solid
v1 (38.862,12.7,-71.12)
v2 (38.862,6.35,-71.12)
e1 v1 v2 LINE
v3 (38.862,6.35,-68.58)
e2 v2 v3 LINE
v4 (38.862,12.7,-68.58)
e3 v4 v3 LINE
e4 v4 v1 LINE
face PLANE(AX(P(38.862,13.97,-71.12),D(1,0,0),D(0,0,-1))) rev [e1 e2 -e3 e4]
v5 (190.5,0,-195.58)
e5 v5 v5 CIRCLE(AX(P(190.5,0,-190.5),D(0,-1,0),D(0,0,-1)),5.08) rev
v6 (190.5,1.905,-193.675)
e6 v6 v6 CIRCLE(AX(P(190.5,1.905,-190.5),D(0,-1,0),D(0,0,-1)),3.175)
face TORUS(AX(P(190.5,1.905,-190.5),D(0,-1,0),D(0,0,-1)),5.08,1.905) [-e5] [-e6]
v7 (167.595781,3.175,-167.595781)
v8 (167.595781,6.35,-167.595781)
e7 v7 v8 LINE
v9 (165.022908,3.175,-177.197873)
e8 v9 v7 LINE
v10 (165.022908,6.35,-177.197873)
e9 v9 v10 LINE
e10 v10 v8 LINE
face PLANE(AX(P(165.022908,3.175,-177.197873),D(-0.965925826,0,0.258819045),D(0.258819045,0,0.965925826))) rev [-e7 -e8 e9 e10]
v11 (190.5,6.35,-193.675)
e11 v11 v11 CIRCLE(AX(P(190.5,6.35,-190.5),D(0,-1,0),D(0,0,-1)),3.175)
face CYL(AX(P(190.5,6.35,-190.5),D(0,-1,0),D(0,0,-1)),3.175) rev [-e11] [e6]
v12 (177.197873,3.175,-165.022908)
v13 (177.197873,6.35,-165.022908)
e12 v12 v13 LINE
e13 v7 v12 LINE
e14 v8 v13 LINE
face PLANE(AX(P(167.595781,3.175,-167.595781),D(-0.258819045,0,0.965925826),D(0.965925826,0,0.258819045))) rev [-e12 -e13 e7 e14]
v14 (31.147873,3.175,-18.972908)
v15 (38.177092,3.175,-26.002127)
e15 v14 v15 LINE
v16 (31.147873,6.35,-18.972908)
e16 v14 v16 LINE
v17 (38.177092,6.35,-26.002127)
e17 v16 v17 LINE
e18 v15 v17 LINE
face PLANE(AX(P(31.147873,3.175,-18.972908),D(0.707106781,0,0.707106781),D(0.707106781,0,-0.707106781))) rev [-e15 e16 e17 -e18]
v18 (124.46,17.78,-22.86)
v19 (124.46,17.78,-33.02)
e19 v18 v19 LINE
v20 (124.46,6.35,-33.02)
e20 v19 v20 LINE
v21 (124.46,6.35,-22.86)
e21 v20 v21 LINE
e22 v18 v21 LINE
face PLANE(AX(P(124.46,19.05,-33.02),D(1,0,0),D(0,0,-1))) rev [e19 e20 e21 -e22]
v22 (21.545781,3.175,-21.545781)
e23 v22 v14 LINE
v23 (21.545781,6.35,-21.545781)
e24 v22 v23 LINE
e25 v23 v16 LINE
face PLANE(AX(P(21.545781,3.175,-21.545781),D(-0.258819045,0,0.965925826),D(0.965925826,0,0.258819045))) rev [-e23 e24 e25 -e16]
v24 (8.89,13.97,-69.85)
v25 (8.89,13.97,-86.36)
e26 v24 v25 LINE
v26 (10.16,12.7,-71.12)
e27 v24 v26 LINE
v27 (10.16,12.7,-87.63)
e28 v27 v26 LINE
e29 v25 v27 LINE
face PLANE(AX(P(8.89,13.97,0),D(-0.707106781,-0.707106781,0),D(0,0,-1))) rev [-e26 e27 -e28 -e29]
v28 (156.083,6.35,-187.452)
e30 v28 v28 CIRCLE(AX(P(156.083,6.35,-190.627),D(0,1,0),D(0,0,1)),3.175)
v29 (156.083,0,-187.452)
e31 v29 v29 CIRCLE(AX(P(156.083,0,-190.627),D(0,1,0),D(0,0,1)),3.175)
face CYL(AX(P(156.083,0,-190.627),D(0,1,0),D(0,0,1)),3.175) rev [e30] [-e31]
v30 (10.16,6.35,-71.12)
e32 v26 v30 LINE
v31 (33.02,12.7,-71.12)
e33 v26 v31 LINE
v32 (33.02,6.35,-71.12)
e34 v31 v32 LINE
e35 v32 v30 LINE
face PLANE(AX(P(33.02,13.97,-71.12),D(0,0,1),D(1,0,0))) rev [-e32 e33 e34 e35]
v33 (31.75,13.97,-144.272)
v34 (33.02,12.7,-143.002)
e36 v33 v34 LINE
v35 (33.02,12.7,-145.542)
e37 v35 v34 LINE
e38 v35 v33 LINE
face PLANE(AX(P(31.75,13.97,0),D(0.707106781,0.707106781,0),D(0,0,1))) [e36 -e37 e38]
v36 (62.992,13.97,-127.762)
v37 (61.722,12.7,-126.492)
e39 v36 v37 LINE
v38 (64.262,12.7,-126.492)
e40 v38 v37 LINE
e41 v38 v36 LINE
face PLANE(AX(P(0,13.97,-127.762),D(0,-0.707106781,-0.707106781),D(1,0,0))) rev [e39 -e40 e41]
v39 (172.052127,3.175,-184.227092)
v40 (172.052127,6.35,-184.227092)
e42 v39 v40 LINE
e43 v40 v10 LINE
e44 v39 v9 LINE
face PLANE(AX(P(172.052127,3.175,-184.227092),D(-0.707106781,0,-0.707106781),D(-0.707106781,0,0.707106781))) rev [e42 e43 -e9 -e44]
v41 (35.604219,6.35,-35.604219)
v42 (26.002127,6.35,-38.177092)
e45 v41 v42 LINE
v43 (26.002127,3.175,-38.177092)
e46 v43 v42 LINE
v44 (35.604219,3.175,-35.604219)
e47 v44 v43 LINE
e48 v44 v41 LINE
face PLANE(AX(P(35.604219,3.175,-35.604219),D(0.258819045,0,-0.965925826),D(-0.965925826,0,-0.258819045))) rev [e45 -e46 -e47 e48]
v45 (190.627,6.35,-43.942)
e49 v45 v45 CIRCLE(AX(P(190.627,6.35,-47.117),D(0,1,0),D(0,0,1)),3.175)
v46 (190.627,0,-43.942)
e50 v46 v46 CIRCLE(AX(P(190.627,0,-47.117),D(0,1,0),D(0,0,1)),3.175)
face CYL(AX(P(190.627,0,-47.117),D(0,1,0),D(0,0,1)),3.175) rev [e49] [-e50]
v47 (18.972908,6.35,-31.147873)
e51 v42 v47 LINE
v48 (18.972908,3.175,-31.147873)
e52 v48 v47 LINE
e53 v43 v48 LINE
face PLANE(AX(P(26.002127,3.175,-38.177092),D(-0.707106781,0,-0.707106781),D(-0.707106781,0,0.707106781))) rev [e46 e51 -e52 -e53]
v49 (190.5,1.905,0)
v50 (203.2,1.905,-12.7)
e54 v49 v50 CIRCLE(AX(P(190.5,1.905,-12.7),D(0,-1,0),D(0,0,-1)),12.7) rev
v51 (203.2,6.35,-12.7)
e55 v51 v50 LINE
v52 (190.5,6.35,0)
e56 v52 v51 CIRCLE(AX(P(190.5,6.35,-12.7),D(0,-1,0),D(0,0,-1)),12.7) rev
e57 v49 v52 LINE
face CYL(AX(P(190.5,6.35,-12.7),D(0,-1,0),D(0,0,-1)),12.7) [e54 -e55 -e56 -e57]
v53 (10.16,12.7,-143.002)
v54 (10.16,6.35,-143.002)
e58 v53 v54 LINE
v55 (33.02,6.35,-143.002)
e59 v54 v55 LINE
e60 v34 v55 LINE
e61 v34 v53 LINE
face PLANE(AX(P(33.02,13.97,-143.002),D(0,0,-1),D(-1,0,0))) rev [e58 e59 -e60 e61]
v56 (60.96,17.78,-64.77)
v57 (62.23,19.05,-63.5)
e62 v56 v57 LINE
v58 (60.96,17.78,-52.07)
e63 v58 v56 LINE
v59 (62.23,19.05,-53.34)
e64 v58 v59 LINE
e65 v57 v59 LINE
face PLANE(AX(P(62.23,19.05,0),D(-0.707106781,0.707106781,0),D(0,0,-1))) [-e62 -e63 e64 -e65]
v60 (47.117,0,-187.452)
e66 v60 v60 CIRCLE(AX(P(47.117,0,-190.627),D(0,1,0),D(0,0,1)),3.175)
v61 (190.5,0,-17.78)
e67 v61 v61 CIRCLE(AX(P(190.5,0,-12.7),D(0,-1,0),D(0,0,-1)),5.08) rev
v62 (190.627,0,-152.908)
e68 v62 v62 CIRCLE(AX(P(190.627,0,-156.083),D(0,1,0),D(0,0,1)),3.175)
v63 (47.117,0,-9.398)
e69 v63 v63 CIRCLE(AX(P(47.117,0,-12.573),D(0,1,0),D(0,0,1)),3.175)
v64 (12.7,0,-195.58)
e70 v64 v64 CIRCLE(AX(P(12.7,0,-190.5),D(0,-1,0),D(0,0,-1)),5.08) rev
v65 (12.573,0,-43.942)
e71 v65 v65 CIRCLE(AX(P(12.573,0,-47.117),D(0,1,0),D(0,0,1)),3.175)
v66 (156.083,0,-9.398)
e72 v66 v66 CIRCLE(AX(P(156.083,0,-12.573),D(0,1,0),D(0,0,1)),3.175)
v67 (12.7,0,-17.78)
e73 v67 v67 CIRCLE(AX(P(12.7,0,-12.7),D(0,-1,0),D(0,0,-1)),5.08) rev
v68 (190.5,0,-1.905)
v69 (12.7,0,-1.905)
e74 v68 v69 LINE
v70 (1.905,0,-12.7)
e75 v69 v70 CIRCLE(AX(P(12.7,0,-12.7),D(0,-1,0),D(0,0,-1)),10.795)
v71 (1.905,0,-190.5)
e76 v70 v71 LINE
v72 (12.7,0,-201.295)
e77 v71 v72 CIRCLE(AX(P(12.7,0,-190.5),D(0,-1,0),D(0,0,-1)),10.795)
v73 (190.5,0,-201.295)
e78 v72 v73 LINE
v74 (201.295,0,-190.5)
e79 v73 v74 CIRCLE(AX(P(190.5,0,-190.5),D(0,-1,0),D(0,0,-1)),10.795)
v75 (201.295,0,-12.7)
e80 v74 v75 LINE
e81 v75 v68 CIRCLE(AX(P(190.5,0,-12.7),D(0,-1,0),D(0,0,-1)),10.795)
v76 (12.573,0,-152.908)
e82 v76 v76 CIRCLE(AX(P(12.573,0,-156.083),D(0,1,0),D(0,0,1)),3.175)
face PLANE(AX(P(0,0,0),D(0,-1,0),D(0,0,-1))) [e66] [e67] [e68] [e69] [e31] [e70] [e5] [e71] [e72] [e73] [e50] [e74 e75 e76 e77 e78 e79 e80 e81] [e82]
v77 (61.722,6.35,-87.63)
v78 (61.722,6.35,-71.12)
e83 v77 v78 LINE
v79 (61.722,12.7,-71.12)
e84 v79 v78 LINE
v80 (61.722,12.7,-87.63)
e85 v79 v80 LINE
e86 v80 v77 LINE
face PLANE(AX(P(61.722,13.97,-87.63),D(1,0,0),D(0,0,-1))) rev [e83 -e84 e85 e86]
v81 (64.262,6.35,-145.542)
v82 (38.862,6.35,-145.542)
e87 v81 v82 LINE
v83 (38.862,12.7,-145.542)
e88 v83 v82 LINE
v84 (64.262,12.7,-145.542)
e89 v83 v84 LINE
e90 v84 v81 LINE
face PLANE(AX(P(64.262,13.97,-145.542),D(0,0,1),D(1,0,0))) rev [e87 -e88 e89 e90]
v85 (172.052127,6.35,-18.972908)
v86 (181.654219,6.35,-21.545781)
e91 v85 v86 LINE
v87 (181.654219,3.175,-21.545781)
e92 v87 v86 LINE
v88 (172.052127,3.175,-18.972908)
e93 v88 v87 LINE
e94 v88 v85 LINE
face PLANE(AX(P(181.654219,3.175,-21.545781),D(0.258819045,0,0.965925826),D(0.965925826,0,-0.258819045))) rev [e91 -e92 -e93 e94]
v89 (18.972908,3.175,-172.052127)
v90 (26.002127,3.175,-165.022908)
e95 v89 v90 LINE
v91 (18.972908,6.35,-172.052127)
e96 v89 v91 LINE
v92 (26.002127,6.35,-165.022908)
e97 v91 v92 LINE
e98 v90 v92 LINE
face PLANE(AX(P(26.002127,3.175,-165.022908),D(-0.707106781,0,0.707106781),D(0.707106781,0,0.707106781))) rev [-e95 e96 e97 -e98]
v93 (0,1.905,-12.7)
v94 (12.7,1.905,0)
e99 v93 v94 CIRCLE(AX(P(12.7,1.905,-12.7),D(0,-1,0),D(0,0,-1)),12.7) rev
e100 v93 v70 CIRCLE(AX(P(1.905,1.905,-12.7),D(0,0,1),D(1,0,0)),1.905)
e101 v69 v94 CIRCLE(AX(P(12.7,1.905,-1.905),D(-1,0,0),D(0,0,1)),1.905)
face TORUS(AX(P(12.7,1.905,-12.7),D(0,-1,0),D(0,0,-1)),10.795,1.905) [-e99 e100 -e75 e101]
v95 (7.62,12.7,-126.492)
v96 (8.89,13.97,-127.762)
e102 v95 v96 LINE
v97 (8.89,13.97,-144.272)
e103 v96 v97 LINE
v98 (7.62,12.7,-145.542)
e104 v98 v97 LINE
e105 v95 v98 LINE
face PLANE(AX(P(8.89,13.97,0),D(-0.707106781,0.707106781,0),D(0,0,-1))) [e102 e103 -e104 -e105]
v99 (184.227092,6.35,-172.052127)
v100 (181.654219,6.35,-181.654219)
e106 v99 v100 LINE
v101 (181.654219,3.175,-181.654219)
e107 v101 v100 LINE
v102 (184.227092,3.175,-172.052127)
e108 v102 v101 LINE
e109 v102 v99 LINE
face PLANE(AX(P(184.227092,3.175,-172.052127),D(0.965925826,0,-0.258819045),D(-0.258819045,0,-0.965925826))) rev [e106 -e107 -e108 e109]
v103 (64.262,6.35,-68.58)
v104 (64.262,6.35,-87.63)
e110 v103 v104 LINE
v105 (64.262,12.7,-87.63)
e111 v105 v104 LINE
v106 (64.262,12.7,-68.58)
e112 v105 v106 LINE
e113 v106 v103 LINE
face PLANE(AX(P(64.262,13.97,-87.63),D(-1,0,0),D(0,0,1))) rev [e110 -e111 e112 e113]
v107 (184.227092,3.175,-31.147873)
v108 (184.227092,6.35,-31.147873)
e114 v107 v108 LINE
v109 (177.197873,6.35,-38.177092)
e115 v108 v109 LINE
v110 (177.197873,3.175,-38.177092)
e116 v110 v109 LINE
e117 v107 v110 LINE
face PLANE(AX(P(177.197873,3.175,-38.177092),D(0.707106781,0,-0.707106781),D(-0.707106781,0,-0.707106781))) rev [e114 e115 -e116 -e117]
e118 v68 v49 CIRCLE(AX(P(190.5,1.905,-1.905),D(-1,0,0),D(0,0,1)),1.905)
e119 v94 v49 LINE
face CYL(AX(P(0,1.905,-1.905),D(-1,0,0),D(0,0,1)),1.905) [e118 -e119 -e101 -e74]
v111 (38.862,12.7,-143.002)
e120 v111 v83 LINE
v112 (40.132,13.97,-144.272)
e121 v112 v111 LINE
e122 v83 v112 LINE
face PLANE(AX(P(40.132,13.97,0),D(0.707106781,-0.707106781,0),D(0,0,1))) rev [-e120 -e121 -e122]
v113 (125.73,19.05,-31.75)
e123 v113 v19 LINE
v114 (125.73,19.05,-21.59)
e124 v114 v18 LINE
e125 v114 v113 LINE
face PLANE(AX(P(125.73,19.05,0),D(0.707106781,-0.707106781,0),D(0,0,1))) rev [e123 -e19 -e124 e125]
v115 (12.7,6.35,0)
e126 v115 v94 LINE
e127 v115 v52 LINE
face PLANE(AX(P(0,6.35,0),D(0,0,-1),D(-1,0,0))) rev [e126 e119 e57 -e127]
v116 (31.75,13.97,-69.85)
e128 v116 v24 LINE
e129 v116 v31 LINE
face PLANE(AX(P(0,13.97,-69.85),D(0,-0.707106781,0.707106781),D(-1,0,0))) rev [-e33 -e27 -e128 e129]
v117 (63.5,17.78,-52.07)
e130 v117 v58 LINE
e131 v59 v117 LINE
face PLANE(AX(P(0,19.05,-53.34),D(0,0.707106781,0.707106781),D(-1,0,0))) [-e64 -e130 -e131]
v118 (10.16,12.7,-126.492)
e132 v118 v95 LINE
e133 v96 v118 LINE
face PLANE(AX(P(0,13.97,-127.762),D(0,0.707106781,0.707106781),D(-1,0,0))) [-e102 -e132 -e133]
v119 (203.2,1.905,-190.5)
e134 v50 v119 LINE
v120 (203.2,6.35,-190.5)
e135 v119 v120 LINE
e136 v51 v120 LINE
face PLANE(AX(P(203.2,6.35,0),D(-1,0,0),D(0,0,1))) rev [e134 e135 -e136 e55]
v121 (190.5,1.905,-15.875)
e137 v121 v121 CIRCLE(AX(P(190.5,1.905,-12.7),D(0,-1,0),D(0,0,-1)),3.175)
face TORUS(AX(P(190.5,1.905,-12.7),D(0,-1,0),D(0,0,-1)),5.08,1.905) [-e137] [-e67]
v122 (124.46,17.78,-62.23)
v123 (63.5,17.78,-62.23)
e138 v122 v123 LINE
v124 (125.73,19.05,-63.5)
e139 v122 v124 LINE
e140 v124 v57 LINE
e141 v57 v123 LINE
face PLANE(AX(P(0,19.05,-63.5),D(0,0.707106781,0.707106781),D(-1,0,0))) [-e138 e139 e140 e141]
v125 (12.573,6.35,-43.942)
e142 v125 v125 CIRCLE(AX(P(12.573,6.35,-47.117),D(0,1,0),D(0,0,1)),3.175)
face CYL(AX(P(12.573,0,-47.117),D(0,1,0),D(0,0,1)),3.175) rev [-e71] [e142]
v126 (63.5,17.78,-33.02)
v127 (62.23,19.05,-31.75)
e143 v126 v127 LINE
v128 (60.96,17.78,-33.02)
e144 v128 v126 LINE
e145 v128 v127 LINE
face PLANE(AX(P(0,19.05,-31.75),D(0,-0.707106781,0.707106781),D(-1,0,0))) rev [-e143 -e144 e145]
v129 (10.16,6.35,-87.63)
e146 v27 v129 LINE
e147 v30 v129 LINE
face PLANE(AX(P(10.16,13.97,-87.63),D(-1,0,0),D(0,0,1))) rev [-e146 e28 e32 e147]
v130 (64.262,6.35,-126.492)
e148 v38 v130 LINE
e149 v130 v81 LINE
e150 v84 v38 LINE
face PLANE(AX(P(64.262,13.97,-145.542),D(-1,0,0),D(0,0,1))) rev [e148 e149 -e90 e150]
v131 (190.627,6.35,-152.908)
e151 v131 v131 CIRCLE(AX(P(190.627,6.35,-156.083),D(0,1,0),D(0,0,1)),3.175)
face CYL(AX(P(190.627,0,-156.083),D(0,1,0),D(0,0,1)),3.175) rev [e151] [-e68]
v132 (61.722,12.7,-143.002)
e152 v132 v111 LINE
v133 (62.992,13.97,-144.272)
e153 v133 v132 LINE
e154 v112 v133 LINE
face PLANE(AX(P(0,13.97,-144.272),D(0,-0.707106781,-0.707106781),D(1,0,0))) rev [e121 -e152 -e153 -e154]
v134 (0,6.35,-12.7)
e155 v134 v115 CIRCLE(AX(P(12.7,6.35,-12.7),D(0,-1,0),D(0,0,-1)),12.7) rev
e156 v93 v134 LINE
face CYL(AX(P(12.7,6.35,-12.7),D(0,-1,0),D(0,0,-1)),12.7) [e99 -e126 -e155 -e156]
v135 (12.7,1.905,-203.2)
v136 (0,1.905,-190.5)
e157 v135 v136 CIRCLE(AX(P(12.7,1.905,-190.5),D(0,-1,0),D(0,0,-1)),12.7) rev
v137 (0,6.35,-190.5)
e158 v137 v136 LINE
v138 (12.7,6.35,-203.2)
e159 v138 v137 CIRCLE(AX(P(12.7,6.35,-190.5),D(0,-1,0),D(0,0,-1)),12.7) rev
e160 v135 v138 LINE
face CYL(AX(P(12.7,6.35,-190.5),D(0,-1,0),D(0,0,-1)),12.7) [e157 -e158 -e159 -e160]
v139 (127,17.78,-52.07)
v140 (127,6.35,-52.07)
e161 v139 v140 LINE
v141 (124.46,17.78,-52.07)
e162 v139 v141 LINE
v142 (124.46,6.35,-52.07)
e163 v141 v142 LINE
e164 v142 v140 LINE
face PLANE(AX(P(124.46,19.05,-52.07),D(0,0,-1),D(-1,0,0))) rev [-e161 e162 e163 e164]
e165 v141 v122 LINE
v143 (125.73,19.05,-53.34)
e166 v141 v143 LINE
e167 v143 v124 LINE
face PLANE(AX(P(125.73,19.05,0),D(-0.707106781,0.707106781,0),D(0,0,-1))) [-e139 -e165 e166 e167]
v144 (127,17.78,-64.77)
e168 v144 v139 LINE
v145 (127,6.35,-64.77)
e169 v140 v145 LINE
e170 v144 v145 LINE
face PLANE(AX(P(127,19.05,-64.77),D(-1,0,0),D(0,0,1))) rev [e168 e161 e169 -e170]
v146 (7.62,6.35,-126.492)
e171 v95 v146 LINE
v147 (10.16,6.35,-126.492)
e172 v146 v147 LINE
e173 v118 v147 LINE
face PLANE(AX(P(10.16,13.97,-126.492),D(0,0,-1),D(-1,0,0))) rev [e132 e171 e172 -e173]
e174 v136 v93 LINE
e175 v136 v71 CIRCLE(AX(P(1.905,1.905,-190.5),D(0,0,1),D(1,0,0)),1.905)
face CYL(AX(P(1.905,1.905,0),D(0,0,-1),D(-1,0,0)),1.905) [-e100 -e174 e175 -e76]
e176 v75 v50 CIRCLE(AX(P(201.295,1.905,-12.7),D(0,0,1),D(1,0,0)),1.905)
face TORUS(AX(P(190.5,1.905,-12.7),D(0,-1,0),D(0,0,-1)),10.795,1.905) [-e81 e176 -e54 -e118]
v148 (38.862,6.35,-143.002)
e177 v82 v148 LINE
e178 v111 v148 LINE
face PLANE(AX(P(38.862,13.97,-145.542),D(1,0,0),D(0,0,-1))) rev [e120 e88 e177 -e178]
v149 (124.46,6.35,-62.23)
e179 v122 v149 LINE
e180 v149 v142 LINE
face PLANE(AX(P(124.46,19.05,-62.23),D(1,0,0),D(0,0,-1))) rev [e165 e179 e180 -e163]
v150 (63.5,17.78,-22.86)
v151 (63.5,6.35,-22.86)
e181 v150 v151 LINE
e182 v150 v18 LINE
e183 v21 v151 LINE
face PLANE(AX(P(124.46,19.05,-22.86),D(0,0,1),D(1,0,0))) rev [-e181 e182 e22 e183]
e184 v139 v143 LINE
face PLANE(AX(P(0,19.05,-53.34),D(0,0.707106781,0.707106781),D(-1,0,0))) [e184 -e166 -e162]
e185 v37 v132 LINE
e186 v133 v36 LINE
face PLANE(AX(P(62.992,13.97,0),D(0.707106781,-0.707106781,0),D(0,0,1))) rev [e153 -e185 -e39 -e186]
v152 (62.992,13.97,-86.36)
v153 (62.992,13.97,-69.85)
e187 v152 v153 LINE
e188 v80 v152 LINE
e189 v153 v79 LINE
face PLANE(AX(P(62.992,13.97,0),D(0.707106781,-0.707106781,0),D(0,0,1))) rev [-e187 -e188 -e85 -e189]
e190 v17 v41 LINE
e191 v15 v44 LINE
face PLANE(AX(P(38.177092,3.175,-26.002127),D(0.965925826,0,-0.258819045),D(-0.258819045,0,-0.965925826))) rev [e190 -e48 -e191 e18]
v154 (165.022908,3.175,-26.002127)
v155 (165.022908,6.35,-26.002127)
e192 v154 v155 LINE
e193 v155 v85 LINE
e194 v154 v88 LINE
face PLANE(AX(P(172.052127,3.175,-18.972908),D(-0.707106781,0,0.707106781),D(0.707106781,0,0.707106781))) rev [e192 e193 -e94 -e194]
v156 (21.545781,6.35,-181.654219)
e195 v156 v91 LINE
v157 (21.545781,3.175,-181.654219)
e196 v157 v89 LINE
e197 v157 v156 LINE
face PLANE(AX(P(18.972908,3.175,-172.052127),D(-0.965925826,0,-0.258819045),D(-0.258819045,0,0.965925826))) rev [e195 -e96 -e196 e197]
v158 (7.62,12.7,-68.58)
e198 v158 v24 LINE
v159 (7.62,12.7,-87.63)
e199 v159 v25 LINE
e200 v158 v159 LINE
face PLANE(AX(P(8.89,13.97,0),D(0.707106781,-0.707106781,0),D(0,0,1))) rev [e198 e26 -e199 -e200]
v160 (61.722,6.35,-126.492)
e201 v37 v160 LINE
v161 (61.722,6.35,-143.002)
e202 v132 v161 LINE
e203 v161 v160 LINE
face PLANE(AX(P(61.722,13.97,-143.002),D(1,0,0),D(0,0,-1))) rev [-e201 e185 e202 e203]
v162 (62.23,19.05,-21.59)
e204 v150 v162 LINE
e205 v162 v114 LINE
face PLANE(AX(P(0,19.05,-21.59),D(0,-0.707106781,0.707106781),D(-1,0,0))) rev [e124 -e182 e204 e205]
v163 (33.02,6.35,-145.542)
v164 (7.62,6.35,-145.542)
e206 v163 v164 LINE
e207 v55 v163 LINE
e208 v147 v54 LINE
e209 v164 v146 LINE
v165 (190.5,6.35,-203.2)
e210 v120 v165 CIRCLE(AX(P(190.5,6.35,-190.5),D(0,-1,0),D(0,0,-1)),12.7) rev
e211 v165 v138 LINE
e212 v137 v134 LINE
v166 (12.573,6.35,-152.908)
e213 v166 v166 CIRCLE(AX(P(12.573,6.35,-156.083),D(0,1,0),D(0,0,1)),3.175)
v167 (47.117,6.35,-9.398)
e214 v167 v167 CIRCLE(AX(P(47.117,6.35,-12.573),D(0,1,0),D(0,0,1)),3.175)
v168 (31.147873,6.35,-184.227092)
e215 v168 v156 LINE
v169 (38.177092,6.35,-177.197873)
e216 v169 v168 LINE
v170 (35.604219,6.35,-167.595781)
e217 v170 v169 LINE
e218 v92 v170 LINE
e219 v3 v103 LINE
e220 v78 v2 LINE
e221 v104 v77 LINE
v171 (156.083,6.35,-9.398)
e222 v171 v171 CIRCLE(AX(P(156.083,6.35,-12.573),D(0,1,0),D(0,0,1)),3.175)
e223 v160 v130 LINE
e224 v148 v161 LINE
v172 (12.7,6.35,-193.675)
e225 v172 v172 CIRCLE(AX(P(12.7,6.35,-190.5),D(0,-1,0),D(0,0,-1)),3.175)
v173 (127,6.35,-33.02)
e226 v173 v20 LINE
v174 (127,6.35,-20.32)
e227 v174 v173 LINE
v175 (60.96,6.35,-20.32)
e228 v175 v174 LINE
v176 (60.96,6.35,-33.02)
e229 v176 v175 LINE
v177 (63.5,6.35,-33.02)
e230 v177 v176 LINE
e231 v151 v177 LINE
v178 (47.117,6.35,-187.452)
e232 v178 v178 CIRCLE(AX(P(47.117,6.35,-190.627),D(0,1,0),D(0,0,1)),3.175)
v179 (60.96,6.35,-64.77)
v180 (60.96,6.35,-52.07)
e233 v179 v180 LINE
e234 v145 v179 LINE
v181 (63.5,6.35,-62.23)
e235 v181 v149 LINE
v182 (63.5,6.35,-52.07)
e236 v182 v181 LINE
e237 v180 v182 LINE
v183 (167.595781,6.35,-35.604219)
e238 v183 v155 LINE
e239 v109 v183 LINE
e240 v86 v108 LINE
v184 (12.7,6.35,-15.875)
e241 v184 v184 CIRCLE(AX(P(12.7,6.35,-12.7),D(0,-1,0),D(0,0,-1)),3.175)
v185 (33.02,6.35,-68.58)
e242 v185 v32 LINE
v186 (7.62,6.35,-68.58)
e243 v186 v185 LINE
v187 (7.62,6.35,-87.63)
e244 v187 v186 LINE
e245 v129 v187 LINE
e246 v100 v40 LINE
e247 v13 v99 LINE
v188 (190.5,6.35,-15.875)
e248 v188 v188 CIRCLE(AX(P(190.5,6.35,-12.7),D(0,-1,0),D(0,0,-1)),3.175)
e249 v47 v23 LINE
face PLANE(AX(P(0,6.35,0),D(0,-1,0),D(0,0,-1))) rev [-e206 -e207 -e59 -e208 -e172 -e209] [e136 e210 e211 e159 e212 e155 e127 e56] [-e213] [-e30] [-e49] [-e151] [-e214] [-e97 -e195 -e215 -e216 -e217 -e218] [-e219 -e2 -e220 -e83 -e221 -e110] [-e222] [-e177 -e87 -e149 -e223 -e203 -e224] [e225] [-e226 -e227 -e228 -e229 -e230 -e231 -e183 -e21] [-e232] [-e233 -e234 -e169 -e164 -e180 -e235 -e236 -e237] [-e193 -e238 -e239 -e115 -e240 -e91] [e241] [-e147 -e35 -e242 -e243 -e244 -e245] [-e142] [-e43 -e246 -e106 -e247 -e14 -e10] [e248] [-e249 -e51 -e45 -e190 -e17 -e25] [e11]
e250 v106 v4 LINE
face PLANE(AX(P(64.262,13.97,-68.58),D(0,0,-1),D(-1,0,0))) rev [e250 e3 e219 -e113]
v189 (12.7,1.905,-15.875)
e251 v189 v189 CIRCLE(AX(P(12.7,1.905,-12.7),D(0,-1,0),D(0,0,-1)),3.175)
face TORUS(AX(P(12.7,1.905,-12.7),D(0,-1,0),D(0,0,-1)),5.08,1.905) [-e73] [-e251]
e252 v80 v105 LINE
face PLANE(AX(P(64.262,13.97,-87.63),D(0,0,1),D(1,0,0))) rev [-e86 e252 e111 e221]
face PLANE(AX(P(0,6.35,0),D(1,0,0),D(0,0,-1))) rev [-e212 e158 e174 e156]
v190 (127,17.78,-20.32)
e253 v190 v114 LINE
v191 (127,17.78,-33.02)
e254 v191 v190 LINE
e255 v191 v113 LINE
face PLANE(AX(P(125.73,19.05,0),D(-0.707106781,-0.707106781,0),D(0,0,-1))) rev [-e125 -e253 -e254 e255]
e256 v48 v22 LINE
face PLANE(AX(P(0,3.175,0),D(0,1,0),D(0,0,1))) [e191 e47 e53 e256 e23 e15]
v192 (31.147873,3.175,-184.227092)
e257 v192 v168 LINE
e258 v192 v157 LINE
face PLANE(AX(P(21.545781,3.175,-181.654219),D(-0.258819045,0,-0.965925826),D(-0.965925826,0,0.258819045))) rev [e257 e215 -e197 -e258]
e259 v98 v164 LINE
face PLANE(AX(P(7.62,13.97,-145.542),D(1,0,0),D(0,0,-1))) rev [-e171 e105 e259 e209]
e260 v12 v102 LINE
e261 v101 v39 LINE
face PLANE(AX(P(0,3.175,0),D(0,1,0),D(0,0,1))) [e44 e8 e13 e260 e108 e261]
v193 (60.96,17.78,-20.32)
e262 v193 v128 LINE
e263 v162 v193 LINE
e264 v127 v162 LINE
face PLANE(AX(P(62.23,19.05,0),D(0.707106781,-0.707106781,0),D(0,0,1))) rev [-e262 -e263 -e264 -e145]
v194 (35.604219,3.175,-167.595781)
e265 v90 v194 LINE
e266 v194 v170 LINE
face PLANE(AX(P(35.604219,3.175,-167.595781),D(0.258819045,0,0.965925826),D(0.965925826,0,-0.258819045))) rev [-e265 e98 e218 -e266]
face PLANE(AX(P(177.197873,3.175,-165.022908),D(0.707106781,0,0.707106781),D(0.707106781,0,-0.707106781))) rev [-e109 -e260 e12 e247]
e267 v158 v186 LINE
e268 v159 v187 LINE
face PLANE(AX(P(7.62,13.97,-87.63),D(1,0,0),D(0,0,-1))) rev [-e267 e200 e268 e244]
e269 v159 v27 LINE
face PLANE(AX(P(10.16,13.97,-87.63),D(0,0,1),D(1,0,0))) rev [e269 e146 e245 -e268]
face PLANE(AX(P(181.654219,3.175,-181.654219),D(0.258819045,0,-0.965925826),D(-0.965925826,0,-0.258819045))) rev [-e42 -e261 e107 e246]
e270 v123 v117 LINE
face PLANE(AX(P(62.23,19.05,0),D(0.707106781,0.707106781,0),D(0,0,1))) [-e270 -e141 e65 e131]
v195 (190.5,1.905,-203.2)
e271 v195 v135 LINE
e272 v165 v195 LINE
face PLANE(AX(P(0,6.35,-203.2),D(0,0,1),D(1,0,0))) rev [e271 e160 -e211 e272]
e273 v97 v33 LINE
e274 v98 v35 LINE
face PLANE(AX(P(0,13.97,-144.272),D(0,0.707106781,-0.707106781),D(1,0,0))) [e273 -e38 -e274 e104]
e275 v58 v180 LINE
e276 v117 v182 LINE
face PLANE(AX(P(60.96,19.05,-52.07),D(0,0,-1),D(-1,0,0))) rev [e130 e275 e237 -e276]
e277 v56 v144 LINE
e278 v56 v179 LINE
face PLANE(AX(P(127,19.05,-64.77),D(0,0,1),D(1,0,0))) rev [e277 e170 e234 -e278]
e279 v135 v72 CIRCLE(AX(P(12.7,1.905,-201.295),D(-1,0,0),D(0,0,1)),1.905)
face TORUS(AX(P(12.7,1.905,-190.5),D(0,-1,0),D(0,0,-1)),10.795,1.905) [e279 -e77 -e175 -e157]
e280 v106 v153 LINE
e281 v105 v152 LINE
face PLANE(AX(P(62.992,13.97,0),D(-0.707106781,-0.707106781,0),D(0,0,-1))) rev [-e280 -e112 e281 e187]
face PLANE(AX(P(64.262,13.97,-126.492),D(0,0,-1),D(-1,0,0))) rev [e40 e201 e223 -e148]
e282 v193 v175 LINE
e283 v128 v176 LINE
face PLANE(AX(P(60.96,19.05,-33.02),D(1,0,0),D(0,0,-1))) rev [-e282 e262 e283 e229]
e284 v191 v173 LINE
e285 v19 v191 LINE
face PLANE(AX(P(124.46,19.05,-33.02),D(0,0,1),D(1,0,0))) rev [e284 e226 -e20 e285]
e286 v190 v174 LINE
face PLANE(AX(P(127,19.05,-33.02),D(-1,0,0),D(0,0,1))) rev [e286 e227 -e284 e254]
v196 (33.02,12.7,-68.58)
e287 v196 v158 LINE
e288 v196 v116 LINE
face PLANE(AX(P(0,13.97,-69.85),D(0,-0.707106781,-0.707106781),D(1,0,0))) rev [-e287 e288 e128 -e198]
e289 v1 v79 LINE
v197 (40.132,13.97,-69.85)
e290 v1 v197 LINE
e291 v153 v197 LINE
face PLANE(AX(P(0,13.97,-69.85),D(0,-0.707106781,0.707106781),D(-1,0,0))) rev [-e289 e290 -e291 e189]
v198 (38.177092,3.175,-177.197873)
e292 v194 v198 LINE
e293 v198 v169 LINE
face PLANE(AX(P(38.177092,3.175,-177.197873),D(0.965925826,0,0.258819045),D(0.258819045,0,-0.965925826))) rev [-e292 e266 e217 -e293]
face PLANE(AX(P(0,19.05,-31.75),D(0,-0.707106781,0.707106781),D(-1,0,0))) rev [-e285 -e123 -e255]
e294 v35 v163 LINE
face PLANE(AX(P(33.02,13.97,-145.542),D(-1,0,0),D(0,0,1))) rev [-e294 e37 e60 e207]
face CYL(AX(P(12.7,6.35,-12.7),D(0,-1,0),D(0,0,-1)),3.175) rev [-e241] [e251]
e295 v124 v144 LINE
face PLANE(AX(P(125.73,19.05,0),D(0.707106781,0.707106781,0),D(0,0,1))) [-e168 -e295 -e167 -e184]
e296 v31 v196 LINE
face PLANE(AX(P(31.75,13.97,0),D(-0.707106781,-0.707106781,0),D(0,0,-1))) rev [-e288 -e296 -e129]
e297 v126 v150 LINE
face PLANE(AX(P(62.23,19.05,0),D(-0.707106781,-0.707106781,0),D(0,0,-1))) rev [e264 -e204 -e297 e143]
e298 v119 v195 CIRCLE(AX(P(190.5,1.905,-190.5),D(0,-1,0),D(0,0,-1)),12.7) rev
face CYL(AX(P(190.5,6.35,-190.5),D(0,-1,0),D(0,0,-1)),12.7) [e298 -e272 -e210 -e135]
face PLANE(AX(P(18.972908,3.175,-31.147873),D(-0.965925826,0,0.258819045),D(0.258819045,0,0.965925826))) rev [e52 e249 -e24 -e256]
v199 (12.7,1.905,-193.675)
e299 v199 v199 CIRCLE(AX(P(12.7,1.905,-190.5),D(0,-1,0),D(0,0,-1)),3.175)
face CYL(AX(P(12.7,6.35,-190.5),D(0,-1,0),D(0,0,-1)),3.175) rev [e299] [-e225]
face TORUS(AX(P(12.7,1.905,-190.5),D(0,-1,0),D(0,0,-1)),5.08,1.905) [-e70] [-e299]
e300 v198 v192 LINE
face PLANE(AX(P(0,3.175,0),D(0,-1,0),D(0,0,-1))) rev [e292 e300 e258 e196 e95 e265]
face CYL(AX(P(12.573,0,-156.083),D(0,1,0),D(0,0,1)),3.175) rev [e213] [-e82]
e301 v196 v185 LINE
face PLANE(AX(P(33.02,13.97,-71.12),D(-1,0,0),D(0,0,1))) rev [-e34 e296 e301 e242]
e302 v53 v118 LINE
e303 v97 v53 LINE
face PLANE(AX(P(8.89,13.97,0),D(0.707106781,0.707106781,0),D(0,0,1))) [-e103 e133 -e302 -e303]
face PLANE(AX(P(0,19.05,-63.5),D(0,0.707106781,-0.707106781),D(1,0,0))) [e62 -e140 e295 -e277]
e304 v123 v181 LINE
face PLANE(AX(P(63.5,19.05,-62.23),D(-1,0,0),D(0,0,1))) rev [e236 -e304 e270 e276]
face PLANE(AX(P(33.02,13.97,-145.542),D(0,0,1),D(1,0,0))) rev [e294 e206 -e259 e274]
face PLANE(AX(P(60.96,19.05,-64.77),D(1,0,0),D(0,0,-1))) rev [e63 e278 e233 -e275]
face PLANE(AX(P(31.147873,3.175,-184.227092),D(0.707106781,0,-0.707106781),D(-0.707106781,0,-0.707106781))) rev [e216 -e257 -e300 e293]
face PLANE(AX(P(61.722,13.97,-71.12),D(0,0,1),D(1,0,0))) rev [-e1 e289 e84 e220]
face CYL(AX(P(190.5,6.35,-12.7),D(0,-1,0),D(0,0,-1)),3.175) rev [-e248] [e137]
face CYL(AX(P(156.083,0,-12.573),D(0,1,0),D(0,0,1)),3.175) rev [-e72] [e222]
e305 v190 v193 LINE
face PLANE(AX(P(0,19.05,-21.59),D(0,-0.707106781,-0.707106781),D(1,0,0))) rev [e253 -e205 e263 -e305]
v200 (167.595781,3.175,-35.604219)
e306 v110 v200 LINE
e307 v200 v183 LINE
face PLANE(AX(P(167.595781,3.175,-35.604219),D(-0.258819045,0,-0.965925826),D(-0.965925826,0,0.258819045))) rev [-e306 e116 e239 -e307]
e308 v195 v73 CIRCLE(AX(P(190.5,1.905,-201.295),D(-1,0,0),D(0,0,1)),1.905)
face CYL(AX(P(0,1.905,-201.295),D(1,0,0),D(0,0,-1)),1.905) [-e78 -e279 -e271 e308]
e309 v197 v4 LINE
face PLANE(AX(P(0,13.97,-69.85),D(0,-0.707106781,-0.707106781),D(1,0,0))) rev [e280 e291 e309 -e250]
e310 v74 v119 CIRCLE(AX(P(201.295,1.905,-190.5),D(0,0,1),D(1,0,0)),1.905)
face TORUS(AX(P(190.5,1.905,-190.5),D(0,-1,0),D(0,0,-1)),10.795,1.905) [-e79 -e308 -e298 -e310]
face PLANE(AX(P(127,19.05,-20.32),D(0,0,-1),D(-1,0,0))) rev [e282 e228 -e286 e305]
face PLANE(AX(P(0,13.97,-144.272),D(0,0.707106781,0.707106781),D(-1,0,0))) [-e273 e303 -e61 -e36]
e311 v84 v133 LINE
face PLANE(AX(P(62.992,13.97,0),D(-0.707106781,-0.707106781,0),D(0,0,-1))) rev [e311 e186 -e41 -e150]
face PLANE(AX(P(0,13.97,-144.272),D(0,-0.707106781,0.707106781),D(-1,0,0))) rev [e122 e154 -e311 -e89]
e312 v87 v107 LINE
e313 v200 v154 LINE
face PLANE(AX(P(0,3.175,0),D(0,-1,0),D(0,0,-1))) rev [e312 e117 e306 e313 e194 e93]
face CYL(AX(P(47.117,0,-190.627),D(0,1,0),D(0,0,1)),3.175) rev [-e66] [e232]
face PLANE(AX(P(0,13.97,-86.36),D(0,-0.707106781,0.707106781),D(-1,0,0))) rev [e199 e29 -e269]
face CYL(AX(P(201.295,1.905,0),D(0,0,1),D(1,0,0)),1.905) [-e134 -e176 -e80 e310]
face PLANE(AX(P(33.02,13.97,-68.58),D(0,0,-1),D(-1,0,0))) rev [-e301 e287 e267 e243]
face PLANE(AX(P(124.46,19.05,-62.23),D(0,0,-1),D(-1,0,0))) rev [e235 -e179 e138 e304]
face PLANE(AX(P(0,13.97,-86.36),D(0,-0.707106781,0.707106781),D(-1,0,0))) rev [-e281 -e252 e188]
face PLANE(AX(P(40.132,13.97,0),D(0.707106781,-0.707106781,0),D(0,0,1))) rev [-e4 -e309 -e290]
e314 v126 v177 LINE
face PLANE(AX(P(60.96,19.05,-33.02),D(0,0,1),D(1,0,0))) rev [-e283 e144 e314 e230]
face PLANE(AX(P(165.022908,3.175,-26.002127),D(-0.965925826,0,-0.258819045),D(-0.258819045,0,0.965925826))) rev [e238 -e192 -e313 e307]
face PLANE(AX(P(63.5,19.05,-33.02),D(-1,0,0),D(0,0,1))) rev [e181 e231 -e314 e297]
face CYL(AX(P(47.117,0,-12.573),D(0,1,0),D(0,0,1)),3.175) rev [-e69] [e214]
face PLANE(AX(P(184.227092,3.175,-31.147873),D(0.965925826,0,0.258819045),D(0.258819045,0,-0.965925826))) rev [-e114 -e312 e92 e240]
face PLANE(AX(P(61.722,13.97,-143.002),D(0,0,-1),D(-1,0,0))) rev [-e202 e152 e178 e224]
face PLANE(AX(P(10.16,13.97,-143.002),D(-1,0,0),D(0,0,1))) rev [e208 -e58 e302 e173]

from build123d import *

# Parameters (mm, degrees)
SKETCH1_W           = 203.2
SKETCH1_H           = 203.2
BOSS_EXTRUDE1_DEPTH = 6.35
FILLET1_R           = 12.7
SKETCH2_R           = 3.175
CUT_EXTRUDE1_DEPTH  = 288.438345563
CUT_EXTRUDE2_DEPTH  = 3.175
BOSS_EXTRUDE2_DEPTH = 7.62
CHAMFER1_SIZE       = 1.27
BOSS_EXTRUDE3_DEPTH = 12.7
CHAMFER2_SIZE       = 1.27
FILLET2_R           = 1.905
SKETCH28_R          = 3.175
CUT_EXTRUDE3_DEPTH  = 288.648692054


with BuildPart() as part:
    # Sketch1 → Boss-Extrude1 (new body)
    with BuildSketch(Plane(origin=(0, 0, 0), x_dir=(1, 0, 0), z_dir=(0, 1, 0))):
        with Locations((101.6, 101.6)):
            Rectangle(SKETCH1_W, SKETCH1_H)
    extrude(amount=BOSS_EXTRUDE1_DEPTH)

    # Fillet1
    fillet1_edges = [part.edges().sort_by_distance(p)[0] for p in [
        (0, 3.175, -203.2),
        (203.2, 3.175, -203.2),
        (203.2, 3.175, 0),
        (0, 3.175, 0),
    ]]
    fillet(fillet1_edges, radius=FILLET1_R)

    # Sketch2 → Cut-Extrude1 (cut, through all)
    with BuildSketch(Plane.XZ):
        with Locations(Location((12.7, -12.7, 0), (0, 0, 270))):
            Circle(SKETCH2_R)
        with Locations(Location((190.5, -12.7, 0), (0, 0, 270))):
            Circle(SKETCH2_R)
        with Locations(Location((190.5, -190.5, 0), (0, 0, 270))):
            Circle(SKETCH2_R)
        with Locations(Location((12.7, -190.5, 0), (0, 0, 270))):
            Circle(SKETCH2_R)
    extrude(amount=-CUT_EXTRUDE1_DEPTH, mode=Mode.SUBTRACT)

    # Sketch22 → Cut-Extrude2 (cut)
    with BuildSketch(Plane(origin=(0, 6.35, 0), x_dir=(1, 0, 0), z_dir=(0, 1, 0))):
        Polygon((181.654219065, 181.654219065), (172.052127253, 184.227091812), (165.022908188, 177.197872747), (167.595780935, 167.595780935), (177.197872747, 165.022908188), (184.227091812, 172.052127253), align=None)
        Polygon((18.972908188, 172.052127253), (21.545780935, 181.654219065), (31.147872747, 184.227091812), (38.177091812, 177.197872747), (35.604219065, 167.595780935), (26.002127253, 165.022908188), align=None)
        Polygon((184.227091812, 31.147872747), (181.654219065, 21.545780935), (172.052127253, 18.972908188), (165.022908188, 26.002127253), (167.595780935, 35.604219065), (177.197872747, 38.177091812), align=None)
        Polygon((21.545780935, 21.545780935), (31.147872747, 18.972908188), (38.177091812, 26.002127253), (35.604219065, 35.604219065), (26.002127253, 38.177091812), (18.972908188, 31.147872747), align=None)
    extrude(amount=-CUT_EXTRUDE2_DEPTH, mode=Mode.SUBTRACT)

    # Sketch23 → Boss-Extrude2 (add)
    with BuildSketch(Plane(origin=(0, 6.35, 0), x_dir=(1, 0, 0), z_dir=(0, 1, 0))):
        Polygon((64.262, 145.542), (38.862, 145.542), (38.862, 143.002), (61.722, 143.002), (61.722, 126.492), (64.262, 126.492), align=None)
        Polygon((64.262, 68.58), (38.862, 68.58), (38.862, 71.12), (61.722, 71.12), (61.722, 87.63), (64.262, 87.63), align=None)
        Polygon((7.62, 145.542), (7.62, 126.492), (10.16, 126.492), (10.16, 143.002), (33.02, 143.002), (33.02, 145.542), align=None)
        Polygon((10.16, 87.63), (7.62, 87.63), (7.62, 68.58), (33.02, 68.58), (33.02, 71.12), (10.16, 71.12), align=None)
    extrude(amount=BOSS_EXTRUDE2_DEPTH)

    # Chamfer1
    chamfer1_edges = [part.edges().sort_by_distance(p)[0] for p in [
        (64.262, 13.97, -136.017),
        (51.562, 13.97, -145.542),
        (38.862, 13.97, -144.272),
        (50.292, 13.97, -143.002),
        (61.722, 13.97, -134.747),
        (62.992, 13.97, -126.492),
        (7.62, 13.97, -78.105),
        (20.32, 13.97, -68.58),
        (33.02, 13.97, -69.85),
        (21.59, 13.97, -71.12),
        (10.16, 13.97, -79.375),
        (8.89, 13.97, -87.63),
        (64.262, 13.97, -78.105),
        (62.992, 13.97, -87.63),
        (61.722, 13.97, -79.375),
        (50.292, 13.97, -71.12),
        (38.862, 13.97, -69.85),
        (51.562, 13.97, -68.58),
        (20.32, 13.97, -145.542),
        (7.62, 13.97, -136.017),
        (8.89, 13.97, -126.492),
        (10.16, 13.97, -134.747),
        (21.59, 13.97, -143.002),
        (33.02, 13.97, -144.272),
    ]]
    chamfer(chamfer1_edges, length=CHAMFER1_SIZE - 0.0001)  # a hair under: the kernel refuses the full size

    # Sketch24 → Boss-Extrude3 (add)
    with BuildSketch(Plane(origin=(0, 6.35, 0), x_dir=(1, 0, 0), z_dir=(0, 1, 0))):
        Polygon((124.46, 62.23), (63.5, 62.23), (63.5, 52.07), (60.96, 52.07), (60.96, 64.77), (127, 64.77), (127, 52.07), (124.46, 52.07), align=None)
        Polygon((124.46, 22.86), (63.5, 22.86), (63.5, 33.02), (60.96, 33.02), (60.96, 20.32), (127, 20.32), (127, 33.02), (124.46, 33.02), align=None)
    extrude(amount=BOSS_EXTRUDE3_DEPTH)

    # Chamfer2
    chamfer2_edges = [part.edges().sort_by_distance(p)[0] for p in [
        (124.46, 19.05, -57.15),
        (125.73, 19.05, -52.07),
        (127, 19.05, -58.42),
        (93.98, 19.05, -64.77),
        (60.96, 19.05, -58.42),
        (62.23, 19.05, -52.07),
        (63.5, 19.05, -57.15),
        (93.98, 19.05, -62.23),
        (63.5, 19.05, -27.94),
        (62.23, 19.05, -33.02),
        (60.96, 19.05, -26.67),
        (93.98, 19.05, -20.32),
        (127, 19.05, -26.67),
        (125.73, 19.05, -33.02),
        (124.46, 19.05, -27.94),
        (93.98, 19.05, -22.86),
    ]]
    chamfer(chamfer2_edges, length=CHAMFER2_SIZE - 0.0001)  # a hair under: the kernel refuses the full size

    # Fillet2
    fillet2_edges = [part.edges().sort_by_distance(p)[0] for p in [
        (0, 0, -101.6),
        (101.6, 0, -203.2),
        (203.2, 0, -101.6),
        (101.6, 0, 0),
        (199.480256121, 0, -199.480256121),
        (199.480256121, 0, -3.719743879),
        (3.719743879, 0, -3.719743879),
        (3.719743879, 0, -199.480256121),
        (12.7, 0, -187.325),
        (190.5, 0, -187.325),
        (190.5, 0, -9.525),
        (12.7, 0, -9.525),
    ]]
    fillet(fillet2_edges, radius=FILLET2_R)

    # Sketch28 → Cut-Extrude3 (cut, through all)
    with BuildSketch(Plane(origin=(0, 6.35, 0), x_dir=(1, 0, 0), z_dir=(0, 1, 0))):
        with Locations(Location((47.117, 190.627, 0), (0, 0, 270))):
            Circle(SKETCH28_R)
        with Locations(Location((156.083, 190.627, 0), (0, 0, 270))):
            Circle(SKETCH28_R)
        with Locations(Location((190.627, 156.083, 0), (0, 0, 270))):
            Circle(SKETCH28_R)
        with Locations(Location((190.627, 47.117, 0), (0, 0, 270))):
            Circle(SKETCH28_R)
        with Locations(Location((156.083, 12.573, 0), (0, 0, 270))):
            Circle(SKETCH28_R)
        with Locations(Location((47.117, 12.573, 0), (0, 0, 270))):
            Circle(SKETCH28_R)
        with Locations(Location((12.573, 156.083, 0), (0, 0, 270))):
            Circle(SKETCH28_R)
        with Locations(Location((12.573, 47.117, 0), (0, 0, 270))):
            Circle(SKETCH28_R)
    extrude(amount=-CUT_EXTRUDE3_DEPTH, mode=Mode.SUBTRACT)


solid = part.part
